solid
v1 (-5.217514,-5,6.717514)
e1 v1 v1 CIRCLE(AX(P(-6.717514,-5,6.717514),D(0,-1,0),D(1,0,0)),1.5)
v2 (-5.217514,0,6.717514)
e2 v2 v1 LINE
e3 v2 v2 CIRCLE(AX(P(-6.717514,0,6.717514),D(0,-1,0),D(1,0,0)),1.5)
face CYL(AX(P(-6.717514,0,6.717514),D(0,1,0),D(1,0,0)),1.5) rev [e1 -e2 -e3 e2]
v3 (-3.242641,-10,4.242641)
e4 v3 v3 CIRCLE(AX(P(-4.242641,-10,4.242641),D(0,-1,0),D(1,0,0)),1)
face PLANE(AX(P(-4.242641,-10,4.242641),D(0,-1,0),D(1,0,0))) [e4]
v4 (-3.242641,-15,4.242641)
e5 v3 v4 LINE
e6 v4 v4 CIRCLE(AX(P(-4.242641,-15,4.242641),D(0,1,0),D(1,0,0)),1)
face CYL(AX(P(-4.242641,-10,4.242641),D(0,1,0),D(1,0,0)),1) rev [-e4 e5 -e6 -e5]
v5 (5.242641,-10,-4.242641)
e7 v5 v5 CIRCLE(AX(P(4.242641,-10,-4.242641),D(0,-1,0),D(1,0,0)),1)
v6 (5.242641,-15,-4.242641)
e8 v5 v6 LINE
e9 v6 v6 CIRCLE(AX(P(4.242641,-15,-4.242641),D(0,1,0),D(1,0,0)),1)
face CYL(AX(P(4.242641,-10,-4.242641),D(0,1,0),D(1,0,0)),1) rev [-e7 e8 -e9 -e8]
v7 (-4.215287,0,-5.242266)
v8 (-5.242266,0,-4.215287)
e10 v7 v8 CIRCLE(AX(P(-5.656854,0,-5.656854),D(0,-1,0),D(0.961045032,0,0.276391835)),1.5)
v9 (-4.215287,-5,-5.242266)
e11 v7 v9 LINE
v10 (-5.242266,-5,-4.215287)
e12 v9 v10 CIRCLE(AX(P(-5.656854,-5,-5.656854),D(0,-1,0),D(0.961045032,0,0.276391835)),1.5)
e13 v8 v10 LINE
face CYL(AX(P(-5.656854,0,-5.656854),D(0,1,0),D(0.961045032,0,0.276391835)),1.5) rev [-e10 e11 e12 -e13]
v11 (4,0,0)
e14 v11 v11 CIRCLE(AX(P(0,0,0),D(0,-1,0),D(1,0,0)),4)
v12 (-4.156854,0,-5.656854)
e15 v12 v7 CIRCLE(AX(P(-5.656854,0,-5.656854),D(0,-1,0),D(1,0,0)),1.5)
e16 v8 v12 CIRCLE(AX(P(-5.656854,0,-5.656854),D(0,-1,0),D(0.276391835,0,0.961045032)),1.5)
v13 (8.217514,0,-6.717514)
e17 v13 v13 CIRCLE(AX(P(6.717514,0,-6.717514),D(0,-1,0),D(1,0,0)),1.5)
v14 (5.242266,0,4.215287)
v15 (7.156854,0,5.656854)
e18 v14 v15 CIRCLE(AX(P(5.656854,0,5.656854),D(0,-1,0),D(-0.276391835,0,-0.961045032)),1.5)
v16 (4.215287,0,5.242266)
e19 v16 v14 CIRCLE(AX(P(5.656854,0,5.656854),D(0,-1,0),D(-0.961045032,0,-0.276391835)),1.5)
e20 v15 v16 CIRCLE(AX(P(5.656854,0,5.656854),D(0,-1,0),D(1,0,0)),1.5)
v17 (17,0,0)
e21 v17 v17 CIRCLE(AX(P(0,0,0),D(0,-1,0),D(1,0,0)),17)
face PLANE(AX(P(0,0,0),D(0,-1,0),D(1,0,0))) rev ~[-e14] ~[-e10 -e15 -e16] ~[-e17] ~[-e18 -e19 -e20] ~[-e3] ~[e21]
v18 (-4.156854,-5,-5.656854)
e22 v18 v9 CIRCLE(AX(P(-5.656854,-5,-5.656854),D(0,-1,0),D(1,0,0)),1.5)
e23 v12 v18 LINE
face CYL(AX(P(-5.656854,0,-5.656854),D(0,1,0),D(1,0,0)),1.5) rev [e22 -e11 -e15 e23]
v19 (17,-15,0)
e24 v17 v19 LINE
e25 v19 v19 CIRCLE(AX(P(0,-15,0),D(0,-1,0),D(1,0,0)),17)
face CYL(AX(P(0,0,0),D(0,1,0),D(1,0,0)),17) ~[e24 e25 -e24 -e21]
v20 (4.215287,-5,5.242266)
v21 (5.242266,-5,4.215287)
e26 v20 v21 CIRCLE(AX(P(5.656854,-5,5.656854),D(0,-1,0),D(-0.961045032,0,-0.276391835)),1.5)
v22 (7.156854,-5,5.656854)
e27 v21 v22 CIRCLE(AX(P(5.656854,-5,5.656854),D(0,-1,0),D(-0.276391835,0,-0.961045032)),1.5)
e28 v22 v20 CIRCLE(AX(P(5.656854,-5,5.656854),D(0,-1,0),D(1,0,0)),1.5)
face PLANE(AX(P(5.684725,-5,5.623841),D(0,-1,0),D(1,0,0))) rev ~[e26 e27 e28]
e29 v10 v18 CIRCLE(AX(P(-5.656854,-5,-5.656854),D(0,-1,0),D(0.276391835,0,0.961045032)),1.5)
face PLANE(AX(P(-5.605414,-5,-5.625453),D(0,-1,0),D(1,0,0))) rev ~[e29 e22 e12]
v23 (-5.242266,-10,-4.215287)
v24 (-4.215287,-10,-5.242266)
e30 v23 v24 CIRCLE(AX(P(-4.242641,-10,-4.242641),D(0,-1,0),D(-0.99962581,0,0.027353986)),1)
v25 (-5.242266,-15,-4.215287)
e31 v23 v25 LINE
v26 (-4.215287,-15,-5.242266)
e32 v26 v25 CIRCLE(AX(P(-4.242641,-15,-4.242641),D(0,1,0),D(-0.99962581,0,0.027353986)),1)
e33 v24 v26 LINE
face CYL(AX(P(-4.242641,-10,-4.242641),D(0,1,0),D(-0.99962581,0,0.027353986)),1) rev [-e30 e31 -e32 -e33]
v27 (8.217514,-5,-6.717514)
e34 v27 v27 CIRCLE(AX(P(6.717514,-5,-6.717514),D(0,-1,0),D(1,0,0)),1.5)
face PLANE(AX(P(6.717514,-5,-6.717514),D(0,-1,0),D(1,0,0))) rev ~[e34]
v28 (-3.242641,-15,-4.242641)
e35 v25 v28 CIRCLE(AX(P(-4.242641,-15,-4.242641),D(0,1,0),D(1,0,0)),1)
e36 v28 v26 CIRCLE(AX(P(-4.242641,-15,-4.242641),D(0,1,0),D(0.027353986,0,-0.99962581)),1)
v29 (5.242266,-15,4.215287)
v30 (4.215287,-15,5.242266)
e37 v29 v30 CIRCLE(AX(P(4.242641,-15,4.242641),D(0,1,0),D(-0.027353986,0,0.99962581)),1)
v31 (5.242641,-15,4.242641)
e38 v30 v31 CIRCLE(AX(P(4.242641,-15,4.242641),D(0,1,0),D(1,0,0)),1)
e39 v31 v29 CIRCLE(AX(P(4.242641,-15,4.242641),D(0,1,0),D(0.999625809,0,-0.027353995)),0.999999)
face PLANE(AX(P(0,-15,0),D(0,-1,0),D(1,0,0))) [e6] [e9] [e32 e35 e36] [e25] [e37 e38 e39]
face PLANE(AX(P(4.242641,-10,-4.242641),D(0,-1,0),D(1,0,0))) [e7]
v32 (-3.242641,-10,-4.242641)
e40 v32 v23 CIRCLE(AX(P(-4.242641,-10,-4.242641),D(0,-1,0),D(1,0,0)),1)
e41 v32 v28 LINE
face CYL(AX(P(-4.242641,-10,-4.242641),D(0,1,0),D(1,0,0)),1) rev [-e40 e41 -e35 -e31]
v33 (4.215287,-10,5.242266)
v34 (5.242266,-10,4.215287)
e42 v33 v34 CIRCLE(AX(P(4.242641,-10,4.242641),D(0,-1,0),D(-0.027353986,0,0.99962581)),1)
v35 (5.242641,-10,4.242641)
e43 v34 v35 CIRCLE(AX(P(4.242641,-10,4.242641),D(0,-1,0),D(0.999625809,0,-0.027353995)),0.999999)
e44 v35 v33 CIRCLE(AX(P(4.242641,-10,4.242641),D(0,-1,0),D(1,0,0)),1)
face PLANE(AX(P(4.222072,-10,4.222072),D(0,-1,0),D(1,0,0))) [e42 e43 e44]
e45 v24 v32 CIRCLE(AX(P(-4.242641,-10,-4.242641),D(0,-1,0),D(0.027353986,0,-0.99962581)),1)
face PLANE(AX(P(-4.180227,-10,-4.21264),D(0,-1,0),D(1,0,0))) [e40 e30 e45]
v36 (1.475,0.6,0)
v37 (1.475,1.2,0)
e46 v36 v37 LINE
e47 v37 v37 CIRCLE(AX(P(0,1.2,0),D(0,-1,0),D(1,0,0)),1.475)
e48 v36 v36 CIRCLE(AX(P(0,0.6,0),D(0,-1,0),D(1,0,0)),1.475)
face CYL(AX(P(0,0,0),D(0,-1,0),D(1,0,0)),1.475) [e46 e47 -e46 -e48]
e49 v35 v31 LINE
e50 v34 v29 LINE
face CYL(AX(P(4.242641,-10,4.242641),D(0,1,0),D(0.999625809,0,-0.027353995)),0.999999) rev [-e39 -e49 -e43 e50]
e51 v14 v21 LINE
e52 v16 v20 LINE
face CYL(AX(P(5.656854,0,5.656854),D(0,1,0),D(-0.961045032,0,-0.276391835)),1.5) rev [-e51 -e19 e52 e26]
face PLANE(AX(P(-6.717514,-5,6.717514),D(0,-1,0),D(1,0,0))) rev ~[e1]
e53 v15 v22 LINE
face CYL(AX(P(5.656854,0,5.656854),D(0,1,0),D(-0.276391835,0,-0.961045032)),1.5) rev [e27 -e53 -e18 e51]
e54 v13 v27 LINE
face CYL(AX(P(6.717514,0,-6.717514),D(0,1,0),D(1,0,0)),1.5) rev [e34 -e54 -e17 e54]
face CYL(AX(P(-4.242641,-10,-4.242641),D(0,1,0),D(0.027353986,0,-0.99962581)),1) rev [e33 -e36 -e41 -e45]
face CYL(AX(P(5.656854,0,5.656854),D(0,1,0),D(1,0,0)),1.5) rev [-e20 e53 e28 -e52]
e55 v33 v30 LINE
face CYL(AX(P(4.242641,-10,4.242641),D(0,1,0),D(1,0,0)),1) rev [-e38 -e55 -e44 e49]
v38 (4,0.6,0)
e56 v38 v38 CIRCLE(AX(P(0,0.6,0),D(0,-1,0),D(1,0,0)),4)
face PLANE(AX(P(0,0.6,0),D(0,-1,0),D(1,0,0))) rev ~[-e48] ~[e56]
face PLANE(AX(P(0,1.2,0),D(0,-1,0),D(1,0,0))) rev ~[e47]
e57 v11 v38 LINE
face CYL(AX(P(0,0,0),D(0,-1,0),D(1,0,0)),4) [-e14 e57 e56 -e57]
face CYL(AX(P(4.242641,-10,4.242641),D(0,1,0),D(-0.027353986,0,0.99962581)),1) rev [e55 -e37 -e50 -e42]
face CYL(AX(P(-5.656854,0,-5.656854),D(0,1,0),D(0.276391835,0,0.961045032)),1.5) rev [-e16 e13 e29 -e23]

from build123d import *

# Parameters (mm, degrees)
F0_R     = 17
F0_R_2   = 1.5
F0_R_3   = 1
F0_R_4   = 4
F0_R_5   = 1.475
F1_DEPTH = 15
F2_START = 10
F2_DEPTH = 15
F3_DEPTH = 5
F4_DEPTH = 0.6
F5_DEPTH = 1.2


# Not quite as in the source:
# - a feature names something its author has since deleted; it is built from what else it names


with BuildPart() as f1:
    # F0 (on Front) → F1 (new body)
    with BuildSketch(Plane.XZ):
        Circle(F0_R)
        with BuildLine():
            ThreePointArc((-4.2152867015, -5.2422664968), (-4.1715341961, -5.447511614), (-4.1568542495, -5.6568542495))
            ThreePointArc((-4.1568542495, -5.6568542495), (-6.8551617286, -6.5591065343), (-5.2422664968, -4.2152867015))
            ThreePointArc((-5.2422664968, -4.2152867015), (-4.2289624147, -3.2427342391), (-3.2426406871, -4.2426406871))
            ThreePointArc((-3.2426406871, -4.2426406871), (-3.525928058, -4.9400093179), (-4.2152867015, -5.2422664968))
        make_face(mode=Mode.SUBTRACT)
        with Locations((6.7175144213, -6.7175144213)):
            Circle(F0_R_2, mode=Mode.SUBTRACT)
        with Locations((4.2426406871, -4.2426406871)):
            Circle(F0_R_3, mode=Mode.SUBTRACT)
        with Locations((-4.2426406871, 4.2426406871)):
            Circle(F0_R_3, mode=Mode.SUBTRACT)
        with Locations((-6.7175144213, 6.7175144213)):
            Circle(F0_R_2, mode=Mode.SUBTRACT)
        Circle(F0_R_4, mode=Mode.SUBTRACT)
        with BuildLine():
            ThreePointArc((4.2152867015, 5.2422664968), (5.447511614, 7.1421743029), (7.1568542495, 5.6568542495))
            ThreePointArc((7.1568542495, 5.6568542495), (6.5591065343, 4.4585467704), (5.2422664968, 4.2152867015))
            ThreePointArc((5.2422664968, 4.2152867015), (3.5355339059, 3.5355339059), (4.2152867015, 5.2422664968))
        make_face(mode=Mode.SUBTRACT)
        with BuildLine():
            ThreePointArc((5.2422664968, 4.2152867015), (6.5591065343, 4.4585467704), (7.1568542495, 5.6568542495))
            ThreePointArc((7.1568542495, 5.6568542495), (5.447511614, 7.1421743029), (4.2152867015, 5.2422664968))
            ThreePointArc((4.2152867015, 5.2422664968), (4.9400093179, 4.9593533163), (5.2426406871, 4.2426406871))
            ThreePointArc((5.2426406871, 4.2426406871), (5.2425471352, 4.2289624147), (5.2422664968, 4.2152867015))
        make_face()
        with BuildLine():
            ThreePointArc((5.2422664968, 4.2152867015), (4.5961940777, 4.5961940777), (4.2152867015, 5.2422664968))
            ThreePointArc((4.2152867015, 5.2422664968), (3.5355339059, 3.5355339059), (5.2422664968, 4.2152867015))
        make_face()
        with BuildLine():
            ThreePointArc((-5.2422664968, -4.2152867015), (-6.8551617286, -6.5591065343), (-4.1568542495, -5.6568542495))
            ThreePointArc((-4.1568542495, -5.6568542495), (-4.1715341961, -5.447511614), (-4.2152867015, -5.2422664968))
            ThreePointArc((-4.2152867015, -5.2422664968), (-4.9497474683, -4.9497474683), (-5.2422664968, -4.2152867015))
        make_face()
        with BuildLine():
            ThreePointArc((-5.2422664968, -4.2152867015), (-4.9497474683, -4.9497474683), (-4.2152867015, -5.2422664968))
            ThreePointArc((-4.2152867015, -5.2422664968), (-4.5961940777, -4.5961940777), (-5.2422664968, -4.2152867015))
        make_face()
        with BuildLine():
            ThreePointArc((-5.2422664968, -4.2152867015), (-4.5961940777, -4.5961940777), (-4.2152867015, -5.2422664968))
            ThreePointArc((-4.2152867015, -5.2422664968), (-3.525928058, -4.9400093179), (-3.2426406871, -4.2426406871))
            ThreePointArc((-3.2426406871, -4.2426406871), (-4.2289624147, -3.2427342391), (-5.2422664968, -4.2152867015))
        make_face()
        with BuildLine():
            ThreePointArc((5.2426406871, 4.2426406871), (4.9400093179, 4.9593533163), (4.2152867015, 5.2422664968))
            ThreePointArc((4.2152867015, 5.2422664968), (4.5961940777, 4.5961940777), (5.2422664968, 4.2152867015))
            ThreePointArc((5.2422664968, 4.2152867015), (5.2425471352, 4.2289624147), (5.2426406871, 4.2426406871))
        make_face()
        with Locations((4.2426406871, -4.2426406871)):
            Circle(F0_R_3)
        with Locations((-4.2426406871, 4.2426406871)):
            Circle(F0_R_3)
        with Locations((-6.7175144213, 6.7175144213)):
            Circle(F0_R_2)
        with Locations((6.7175144213, -6.7175144213)):
            Circle(F0_R_2)
        Circle(F0_R_4)
        Circle(F0_R_5, mode=Mode.SUBTRACT)
        Circle(F0_R_5)
    extrude(amount=F1_DEPTH)

    # F0 (on Front) → F2 (cut)
    with BuildSketch(Plane.XZ.offset(F2_START)):
        with BuildLine():
            ThreePointArc((-5.2422664968, -4.2152867015), (-4.5961940777, -4.5961940777), (-4.2152867015, -5.2422664968))
            ThreePointArc((-4.2152867015, -5.2422664968), (-3.525928058, -4.9400093179), (-3.2426406871, -4.2426406871))
            ThreePointArc((-3.2426406871, -4.2426406871), (-4.2289624147, -3.2427342391), (-5.2422664968, -4.2152867015))
        make_face()
        with BuildLine():
            ThreePointArc((-5.2422664968, -4.2152867015), (-4.9497474683, -4.9497474683), (-4.2152867015, -5.2422664968))
            ThreePointArc((-4.2152867015, -5.2422664968), (-4.5961940777, -4.5961940777), (-5.2422664968, -4.2152867015))
        make_face()
        with Locations((4.2426406871, -4.2426406871)):
            Circle(F0_R_3)
        with BuildLine():
            ThreePointArc((5.2422664968, 4.2152867015), (4.5961940777, 4.5961940777), (4.2152867015, 5.2422664968))
            ThreePointArc((4.2152867015, 5.2422664968), (3.5355339059, 3.5355339059), (5.2422664968, 4.2152867015))
        make_face()
        with BuildLine():
            ThreePointArc((5.2426406871, 4.2426406871), (4.9400093179, 4.9593533163), (4.2152867015, 5.2422664968))
            ThreePointArc((4.2152867015, 5.2422664968), (4.5961940777, 4.5961940777), (5.2422664968, 4.2152867015))
            ThreePointArc((5.2422664968, 4.2152867015), (5.2425471352, 4.2289624147), (5.2426406871, 4.2426406871))
        make_face()
        with Locations((-4.2426406871, 4.2426406871)):
            Circle(F0_R_3)
    extrude(amount=F2_DEPTH, mode=Mode.SUBTRACT)

    # F0 (on Front) → F3 (cut)
    with BuildSketch(Plane.XZ):
        with BuildLine():
            ThreePointArc((5.2422664968, 4.2152867015), (6.5591065343, 4.4585467704), (7.1568542495, 5.6568542495))
            ThreePointArc((7.1568542495, 5.6568542495), (5.447511614, 7.1421743029), (4.2152867015, 5.2422664968))
            ThreePointArc((4.2152867015, 5.2422664968), (4.9400093179, 4.9593533163), (5.2426406871, 4.2426406871))
            ThreePointArc((5.2426406871, 4.2426406871), (5.2425471352, 4.2289624147), (5.2422664968, 4.2152867015))
        make_face()
        with BuildLine():
            ThreePointArc((5.2426406871, 4.2426406871), (4.9400093179, 4.9593533163), (4.2152867015, 5.2422664968))
            ThreePointArc((4.2152867015, 5.2422664968), (4.5961940777, 4.5961940777), (5.2422664968, 4.2152867015))
            ThreePointArc((5.2422664968, 4.2152867015), (5.2425471352, 4.2289624147), (5.2426406871, 4.2426406871))
        make_face()
        with BuildLine():
            ThreePointArc((-5.2422664968, -4.2152867015), (-6.8551617286, -6.5591065343), (-4.1568542495, -5.6568542495))
            ThreePointArc((-4.1568542495, -5.6568542495), (-4.1715341961, -5.447511614), (-4.2152867015, -5.2422664968))
            ThreePointArc((-4.2152867015, -5.2422664968), (-4.9497474683, -4.9497474683), (-5.2422664968, -4.2152867015))
        make_face()
        with BuildLine():
            ThreePointArc((-5.2422664968, -4.2152867015), (-4.9497474683, -4.9497474683), (-4.2152867015, -5.2422664968))
            ThreePointArc((-4.2152867015, -5.2422664968), (-4.5961940777, -4.5961940777), (-5.2422664968, -4.2152867015))
        make_face()
        with Locations((6.7175144213, -6.7175144213)):
            Circle(F0_R_2)
        with Locations((-6.7175144213, 6.7175144213)):
            Circle(F0_R_2)
    extrude(amount=F3_DEPTH, mode=Mode.SUBTRACT)

    # F0 (on Front) → F4 (join)
    with BuildSketch(Plane.XZ):
        Circle(F0_R_4)
        Circle(F0_R_5, mode=Mode.SUBTRACT)
    extrude(amount=-F4_DEPTH)

    # F0 (on Front) → F5 (join)
    with BuildSketch(Plane.XZ):
        Circle(F0_R_5)
    extrude(amount=-F5_DEPTH)


solid = f1.part
